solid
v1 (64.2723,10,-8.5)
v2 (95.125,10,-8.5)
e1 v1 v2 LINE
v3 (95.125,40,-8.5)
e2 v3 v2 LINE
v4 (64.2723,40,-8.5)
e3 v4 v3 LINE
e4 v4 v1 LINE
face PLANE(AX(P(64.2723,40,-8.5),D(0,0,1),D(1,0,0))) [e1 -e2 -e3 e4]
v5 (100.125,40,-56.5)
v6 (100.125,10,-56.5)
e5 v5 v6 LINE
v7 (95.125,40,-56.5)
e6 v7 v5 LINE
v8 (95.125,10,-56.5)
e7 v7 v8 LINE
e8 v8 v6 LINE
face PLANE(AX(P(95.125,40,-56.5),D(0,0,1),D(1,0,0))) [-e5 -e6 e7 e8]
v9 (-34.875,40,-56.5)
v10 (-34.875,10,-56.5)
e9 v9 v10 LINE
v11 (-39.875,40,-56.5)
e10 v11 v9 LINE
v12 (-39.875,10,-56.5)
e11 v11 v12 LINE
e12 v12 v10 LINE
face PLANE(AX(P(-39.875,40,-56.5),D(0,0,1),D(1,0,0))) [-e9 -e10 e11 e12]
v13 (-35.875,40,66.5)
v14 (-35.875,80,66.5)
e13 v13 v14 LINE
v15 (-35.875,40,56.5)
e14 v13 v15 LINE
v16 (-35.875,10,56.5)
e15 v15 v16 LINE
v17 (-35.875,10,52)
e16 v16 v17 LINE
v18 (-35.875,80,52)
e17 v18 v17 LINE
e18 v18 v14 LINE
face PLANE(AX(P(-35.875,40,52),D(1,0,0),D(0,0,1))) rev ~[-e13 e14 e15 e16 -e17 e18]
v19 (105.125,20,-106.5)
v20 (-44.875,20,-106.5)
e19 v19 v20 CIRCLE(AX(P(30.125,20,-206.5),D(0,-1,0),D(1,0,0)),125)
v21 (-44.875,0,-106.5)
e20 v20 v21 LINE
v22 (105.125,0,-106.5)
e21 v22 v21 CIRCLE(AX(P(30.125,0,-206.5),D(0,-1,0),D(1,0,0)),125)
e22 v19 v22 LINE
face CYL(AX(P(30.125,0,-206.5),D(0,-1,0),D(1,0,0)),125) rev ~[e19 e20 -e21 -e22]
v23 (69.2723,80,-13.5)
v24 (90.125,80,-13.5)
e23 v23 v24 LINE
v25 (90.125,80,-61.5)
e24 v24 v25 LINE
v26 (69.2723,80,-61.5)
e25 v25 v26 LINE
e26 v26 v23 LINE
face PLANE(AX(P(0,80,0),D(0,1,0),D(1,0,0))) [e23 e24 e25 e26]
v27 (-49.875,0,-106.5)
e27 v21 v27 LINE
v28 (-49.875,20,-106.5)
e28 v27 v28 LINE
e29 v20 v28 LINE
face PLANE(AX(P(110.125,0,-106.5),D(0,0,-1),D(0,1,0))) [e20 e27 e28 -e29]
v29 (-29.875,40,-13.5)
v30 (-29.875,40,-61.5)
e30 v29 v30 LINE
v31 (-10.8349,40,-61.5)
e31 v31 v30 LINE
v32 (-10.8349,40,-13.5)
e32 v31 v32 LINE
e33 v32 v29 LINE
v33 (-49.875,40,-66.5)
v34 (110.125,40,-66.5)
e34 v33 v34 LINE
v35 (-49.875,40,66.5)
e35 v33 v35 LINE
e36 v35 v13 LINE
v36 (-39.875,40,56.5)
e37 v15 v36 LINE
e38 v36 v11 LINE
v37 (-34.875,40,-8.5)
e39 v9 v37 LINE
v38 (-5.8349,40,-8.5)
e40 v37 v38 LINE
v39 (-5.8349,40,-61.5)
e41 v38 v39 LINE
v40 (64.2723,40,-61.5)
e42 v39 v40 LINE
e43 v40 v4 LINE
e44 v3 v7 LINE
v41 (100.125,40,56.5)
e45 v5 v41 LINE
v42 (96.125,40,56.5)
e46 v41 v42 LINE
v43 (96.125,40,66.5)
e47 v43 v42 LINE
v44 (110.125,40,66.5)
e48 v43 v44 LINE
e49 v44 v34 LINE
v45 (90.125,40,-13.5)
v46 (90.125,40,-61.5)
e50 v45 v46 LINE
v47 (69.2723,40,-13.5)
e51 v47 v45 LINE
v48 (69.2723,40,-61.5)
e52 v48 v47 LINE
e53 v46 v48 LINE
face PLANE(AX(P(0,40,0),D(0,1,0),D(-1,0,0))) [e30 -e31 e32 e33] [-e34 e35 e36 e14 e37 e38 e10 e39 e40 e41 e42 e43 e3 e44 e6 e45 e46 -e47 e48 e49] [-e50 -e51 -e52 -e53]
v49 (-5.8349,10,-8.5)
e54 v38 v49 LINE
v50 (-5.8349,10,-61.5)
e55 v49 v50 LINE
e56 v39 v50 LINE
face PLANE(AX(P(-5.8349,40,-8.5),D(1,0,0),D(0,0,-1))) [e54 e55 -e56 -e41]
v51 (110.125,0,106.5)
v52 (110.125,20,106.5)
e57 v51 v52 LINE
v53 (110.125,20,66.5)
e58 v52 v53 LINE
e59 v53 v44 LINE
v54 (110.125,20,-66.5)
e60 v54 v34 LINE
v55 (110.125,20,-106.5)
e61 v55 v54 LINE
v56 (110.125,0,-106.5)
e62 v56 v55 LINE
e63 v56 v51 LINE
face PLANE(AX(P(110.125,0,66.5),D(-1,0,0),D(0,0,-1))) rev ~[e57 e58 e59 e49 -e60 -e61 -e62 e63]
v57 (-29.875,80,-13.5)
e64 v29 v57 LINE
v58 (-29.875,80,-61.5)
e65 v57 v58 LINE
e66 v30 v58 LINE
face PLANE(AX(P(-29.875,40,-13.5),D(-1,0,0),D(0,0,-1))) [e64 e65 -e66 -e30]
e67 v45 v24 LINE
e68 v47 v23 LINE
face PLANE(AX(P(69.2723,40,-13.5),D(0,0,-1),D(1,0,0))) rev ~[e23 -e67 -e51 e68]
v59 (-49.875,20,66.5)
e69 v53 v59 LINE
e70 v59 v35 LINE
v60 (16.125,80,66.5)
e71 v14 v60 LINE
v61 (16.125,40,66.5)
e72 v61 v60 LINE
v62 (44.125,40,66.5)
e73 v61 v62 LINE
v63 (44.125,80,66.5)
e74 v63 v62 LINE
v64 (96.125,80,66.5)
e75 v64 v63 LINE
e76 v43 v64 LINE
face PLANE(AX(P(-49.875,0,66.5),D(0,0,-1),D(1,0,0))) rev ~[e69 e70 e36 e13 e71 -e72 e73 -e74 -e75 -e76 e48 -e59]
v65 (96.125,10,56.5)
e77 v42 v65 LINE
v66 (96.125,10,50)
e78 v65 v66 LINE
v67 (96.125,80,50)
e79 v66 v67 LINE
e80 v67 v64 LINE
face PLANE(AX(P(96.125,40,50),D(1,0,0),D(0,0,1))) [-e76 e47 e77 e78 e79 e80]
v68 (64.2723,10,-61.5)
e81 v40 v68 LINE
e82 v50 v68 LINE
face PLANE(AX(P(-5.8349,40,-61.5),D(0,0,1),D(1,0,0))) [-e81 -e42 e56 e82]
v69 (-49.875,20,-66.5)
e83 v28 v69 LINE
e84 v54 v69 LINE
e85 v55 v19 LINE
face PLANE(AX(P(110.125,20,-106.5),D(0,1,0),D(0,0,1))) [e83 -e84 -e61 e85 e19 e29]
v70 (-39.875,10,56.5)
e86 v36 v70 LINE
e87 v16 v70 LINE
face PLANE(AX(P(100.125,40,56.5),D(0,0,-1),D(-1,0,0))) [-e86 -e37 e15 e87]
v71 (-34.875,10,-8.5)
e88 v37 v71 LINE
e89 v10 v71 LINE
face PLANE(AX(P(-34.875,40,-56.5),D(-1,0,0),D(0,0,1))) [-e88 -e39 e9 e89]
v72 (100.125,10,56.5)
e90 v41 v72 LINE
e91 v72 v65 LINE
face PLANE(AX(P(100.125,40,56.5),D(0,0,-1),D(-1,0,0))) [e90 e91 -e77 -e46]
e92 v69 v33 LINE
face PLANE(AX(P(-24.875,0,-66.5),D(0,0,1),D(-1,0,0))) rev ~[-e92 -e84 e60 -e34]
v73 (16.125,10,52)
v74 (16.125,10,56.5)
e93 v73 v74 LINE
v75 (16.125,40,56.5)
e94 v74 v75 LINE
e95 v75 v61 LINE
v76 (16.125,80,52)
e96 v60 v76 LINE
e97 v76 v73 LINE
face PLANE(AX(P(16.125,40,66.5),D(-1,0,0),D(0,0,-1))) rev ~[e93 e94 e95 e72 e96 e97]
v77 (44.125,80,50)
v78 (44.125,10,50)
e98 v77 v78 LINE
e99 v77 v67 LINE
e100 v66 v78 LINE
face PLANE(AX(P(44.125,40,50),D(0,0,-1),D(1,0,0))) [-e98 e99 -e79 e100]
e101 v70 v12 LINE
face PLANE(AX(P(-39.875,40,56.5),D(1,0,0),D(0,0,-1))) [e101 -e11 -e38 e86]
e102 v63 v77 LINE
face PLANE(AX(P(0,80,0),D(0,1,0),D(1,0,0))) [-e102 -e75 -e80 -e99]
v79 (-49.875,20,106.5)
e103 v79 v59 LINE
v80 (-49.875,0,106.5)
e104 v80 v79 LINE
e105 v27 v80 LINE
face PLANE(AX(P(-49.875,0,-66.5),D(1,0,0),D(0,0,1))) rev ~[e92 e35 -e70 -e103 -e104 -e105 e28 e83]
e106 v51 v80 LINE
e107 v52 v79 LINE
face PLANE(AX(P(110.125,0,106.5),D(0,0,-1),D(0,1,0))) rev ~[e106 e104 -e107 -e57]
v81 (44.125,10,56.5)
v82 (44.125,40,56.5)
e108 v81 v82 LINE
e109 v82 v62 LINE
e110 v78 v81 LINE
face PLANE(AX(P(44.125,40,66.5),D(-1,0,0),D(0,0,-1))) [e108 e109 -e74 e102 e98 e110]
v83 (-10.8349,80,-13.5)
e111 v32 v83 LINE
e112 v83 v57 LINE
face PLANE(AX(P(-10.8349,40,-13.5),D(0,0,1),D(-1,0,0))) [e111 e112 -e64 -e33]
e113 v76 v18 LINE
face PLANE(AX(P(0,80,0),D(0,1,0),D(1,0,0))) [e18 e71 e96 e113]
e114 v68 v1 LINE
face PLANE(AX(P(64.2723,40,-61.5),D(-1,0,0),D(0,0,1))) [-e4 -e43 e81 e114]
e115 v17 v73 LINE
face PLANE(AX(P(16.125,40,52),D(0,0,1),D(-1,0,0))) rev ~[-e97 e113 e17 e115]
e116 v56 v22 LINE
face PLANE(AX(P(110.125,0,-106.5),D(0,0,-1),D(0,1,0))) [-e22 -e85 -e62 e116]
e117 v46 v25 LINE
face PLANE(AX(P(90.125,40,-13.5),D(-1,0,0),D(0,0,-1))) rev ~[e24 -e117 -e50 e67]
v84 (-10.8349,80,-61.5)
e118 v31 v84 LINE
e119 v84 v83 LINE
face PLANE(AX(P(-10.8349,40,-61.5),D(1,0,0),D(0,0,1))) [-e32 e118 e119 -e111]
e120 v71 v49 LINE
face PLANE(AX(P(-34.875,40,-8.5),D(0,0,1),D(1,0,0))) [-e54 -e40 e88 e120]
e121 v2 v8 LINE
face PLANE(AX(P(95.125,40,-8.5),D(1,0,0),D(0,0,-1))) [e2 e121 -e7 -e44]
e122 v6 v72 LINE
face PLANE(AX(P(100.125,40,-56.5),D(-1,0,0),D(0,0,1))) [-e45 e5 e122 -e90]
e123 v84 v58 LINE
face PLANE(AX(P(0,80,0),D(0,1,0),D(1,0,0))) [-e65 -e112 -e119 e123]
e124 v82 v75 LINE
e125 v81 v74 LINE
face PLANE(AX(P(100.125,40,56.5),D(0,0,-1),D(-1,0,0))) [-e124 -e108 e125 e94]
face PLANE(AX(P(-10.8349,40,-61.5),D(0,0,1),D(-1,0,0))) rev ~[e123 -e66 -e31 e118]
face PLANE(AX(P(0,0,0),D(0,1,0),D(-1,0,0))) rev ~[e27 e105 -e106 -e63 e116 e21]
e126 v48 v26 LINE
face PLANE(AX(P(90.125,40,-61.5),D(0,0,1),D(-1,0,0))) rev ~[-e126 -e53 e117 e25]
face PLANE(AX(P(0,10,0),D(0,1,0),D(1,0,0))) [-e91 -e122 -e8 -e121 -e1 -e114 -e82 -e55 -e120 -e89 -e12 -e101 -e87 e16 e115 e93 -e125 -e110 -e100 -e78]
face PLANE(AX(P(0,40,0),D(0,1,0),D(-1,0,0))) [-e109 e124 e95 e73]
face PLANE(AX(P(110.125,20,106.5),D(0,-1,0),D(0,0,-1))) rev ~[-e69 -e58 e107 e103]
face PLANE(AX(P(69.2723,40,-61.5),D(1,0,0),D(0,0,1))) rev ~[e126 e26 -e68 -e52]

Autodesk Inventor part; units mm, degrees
ref_plane "YZ Plane" through (0, 0, 0) normal (1, 0, 0) x (0, 1, 0)
ref_plane "XZ Plane" through (0, 0, 0) normal (0, 1, 0) x (-1, 0, 0)
ref_plane "XY Plane" through (0, 0, 0) normal (0, 0, 1) x (1, 0, 0)
sketch "Sketch1" plane through (0, 0, 0) normal (0, 1, 0) x (-1, 0, 0)
  line L0 (49.875, 66.5) -> (-110.125, 66.5)
  line L1 (-110.125, 66.5) -> (-110.125, -66.5)
  line L2 (-110.125, -66.5) -> (49.875, -66.5)
  line L3 (49.875, -66.5) -> (49.875, 66.5)
  line L4 (24.875, -66.5) -> (-85.125, -66.5)
  line L5 (-85.125, -66.5) -> (-85.125, -219)
  line L6 (-85.125, -219) -> (24.875, -219)
  line L7 (24.875, -219) -> (24.875, -66.5)
  point P0 (0, 0)
  dimension "d0" = 133
  dimension "d1" = 160
  dimension "d2" = 25
  dimension "d3" = 25
  dimension "d4" = 110
extrude "Extrusion1" add sketch "Sketch1" along normal blind 40 contours L3 L2 L1 L0
sketch "Sketch2" plane through (0, 40, 0) normal (0, 1, 0) x (1, 0, 0)
  line L0 (110.125, 66.5) -> (-49.875, 66.5) construction
  line L1 (-49.875, 66.5) -> (-49.875, -66.5) construction
  line L2 (-49.875, -66.5) -> (110.125, -66.5) construction
  line L3 (110.125, -66.5) -> (110.125, 66.5) construction
  line L4 (-29.875, 66.5) -> (-10.8349, 66.5)
  line L5 (-10.8349, 66.5) -> (-10.8349, 13.5)
  line L6 (-10.8349, 13.5) -> (-29.875, 13.5)
  line L7 (-29.875, 13.5) -> (-29.875, 66.5)
  line L8 (90.125, 66.5) -> (69.2723, 66.5)
  line L9 (69.2723, 66.5) -> (69.2723, 13.5)
  line L10 (69.2723, 13.5) -> (90.125, 13.5)
  line L11 (90.125, 13.5) -> (90.125, 66.5)
  line L12 (-32.3584, 66.5) -> (100, 66.5)
  line L13 (100, 66.5) -> (100, 61.5)
  line L14 (100, 61.5) -> (-32.3584, 61.5)
  line L15 (-32.3584, 61.5) -> (-32.3584, 66.5)
  point P0 (0, 0)
  point P1 (-10.8349, 61.5)
  point P2 (-29.875, 61.5)
  point P3 (90.125, 61.5)
  point P4 (69.2723, 61.5)
  point P5 (-27, 66.5)
  dimension "d7" = 20
  dimension "d8" = 20
  dimension "d11" = 80
  dimension "d12" = 80
  dimension "d13" = 120
  dimension "d35" = 5
extrude "Extrusion2" add sketch "Sketch2" along normal blind 40 contours L14 L5 L6 L7 | L14 L11 L10 L9
sketch "Sketch3" plane through (0, 40, 0) normal (0, 1, 0) x (1, 0, 0)
  line L0 (90.125, 61.5) -> (90.125, 13.5) construction
  line L1 (90.125, 13.5) -> (69.2723, 13.5) construction
  line L2 (69.2723, 13.5) -> (69.2723, 61.5) construction
  line L3 (-10.8349, 61.5) -> (-10.8349, 13.5) construction
  line L4 (-10.8349, 13.5) -> (-29.875, 13.5) construction
  line L5 (-29.875, 13.5) -> (-29.875, 61.5) construction
  line L6 (-49.875, 66.5) -> (-49.875, -66.5) construction
  line L7 (-49.875, -66.5) -> (110.125, -66.5) construction
  line L8 (110.125, -66.5) -> (110.125, 66.5) construction
  line L9 (-39.875, -56.5) -> (-39.875, 56.5)
  line L10 (-39.875, 56.5) -> (-34.875, 56.5)
  line L11 (-34.875, 56.5) -> (-34.875, 8.5)
  line L12 (-34.875, 8.5) -> (-5.8349, 8.5)
  line L13 (-5.8349, 8.5) -> (-5.8349, 61.5)
  line L14 (-5.8349, 61.5) -> (64.2723, 61.5)
  line L15 (64.2723, 61.5) -> (64.2723, 8.5)
  line L16 (64.2723, 8.5) -> (95.125, 8.5)
  line L17 (95.125, 8.5) -> (95.125, 56.5)
  line L18 (95.125, 56.5) -> (100.125, 56.5)
  line L19 (100.125, 56.5) -> (100.125, -56.5)
  line L20 (100.125, -56.5) -> (-39.875, -56.5)
  line L21 (-29.875, 61.5) -> (-10.8349, 61.5) projected
  line L22 (69.2723, 61.5) -> (90.125, 61.5) projected
  line L23 (110.125, 66.5) -> (-49.875, 66.5) projected
  point P0 (0, 0)
  dimension "d16" = 10
extrude "Extrusion3" cut sketch "Sketch3" against normal blind 30
sketch "Sketch4" plane through (0, 40, 0) normal (0, 1, 0) x (1, 0, 0)
  line L0 (-49.875, 66.5) -> (-49.875, -66.5) construction
  line L1 (-49.875, -66.5) -> (110.125, -66.5) construction
  line L2 (110.125, -66.5) -> (110.125, 66.5) construction
  line L3 (-35.875, -66.5) -> (16.125, -66.5)
  line L4 (16.125, -66.5) -> (16.125, -52)
  line L5 (16.125, -52) -> (-35.875, -52)
  line L6 (-35.875, -52) -> (-35.875, -66.5)
  line L7 (96.125, -66.5) -> (44.125, -66.5)
  line L8 (44.125, -66.5) -> (44.125, -50)
  line L9 (44.125, -50) -> (96.125, -50)
  line L10 (96.125, -50) -> (96.125, -66.5)
  point P0 (0, 0)
  dimension "d19" = 28
  dimension "d20" = 14
  dimension "d21" = 14
  dimension "d24" = 52
  dimension "d25" = 52
extrude "Extrusion4" add sketch "Sketch4" along normal mid plane 80
sketch "Sketch5" plane through (110.125, 0, 66.5) normal (1, 0, 0) x (0, 0, -1)
  line L0 (133, 0) -> (133, 40) construction
  line L1 (133, 0) -> (173, 0)
  line L2 (173, 0) -> (173, 20)
  line L3 (173, 20) -> (133, 20)
  line L4 (133, 20) -> (133, 0)
  line L5 (0, 0) -> (-40, 0)
  line L6 (-40, 0) -> (-40, 20)
  line L7 (-40, 20) -> (0, 20)
  line L8 (0, 20) -> (0, 0)
  point P0 (66.5, 0)
  dimension "d26" = 20
  dimension "d27" = 40
  dimension "d30" = 40
extrude "Extrusion5" add sketch "Sketch5" against normal up to surface (160 mm away)
sketch "Sketch6" plane through (0, 0, 0) normal (0, -1, 0) x (1, 0, 0)
  line L0 (110.125, -106.5) -> (-49.875, -106.5) construction
  circle A0 centre (30.125, -206.5) radius 125
  point P0 (0, 0)
  dimension "d31" = 100
  dimension "d32" = 250
extrude "Extrusion6" cut sketch "Sketch6" against normal blind 100
sketch "Sketch7" plane through (0, 80, 0) normal (0, 1, 0) x (1, 0, 0)
  point P0 (0, 0)
properties part number "FlanecForwardBabka"
